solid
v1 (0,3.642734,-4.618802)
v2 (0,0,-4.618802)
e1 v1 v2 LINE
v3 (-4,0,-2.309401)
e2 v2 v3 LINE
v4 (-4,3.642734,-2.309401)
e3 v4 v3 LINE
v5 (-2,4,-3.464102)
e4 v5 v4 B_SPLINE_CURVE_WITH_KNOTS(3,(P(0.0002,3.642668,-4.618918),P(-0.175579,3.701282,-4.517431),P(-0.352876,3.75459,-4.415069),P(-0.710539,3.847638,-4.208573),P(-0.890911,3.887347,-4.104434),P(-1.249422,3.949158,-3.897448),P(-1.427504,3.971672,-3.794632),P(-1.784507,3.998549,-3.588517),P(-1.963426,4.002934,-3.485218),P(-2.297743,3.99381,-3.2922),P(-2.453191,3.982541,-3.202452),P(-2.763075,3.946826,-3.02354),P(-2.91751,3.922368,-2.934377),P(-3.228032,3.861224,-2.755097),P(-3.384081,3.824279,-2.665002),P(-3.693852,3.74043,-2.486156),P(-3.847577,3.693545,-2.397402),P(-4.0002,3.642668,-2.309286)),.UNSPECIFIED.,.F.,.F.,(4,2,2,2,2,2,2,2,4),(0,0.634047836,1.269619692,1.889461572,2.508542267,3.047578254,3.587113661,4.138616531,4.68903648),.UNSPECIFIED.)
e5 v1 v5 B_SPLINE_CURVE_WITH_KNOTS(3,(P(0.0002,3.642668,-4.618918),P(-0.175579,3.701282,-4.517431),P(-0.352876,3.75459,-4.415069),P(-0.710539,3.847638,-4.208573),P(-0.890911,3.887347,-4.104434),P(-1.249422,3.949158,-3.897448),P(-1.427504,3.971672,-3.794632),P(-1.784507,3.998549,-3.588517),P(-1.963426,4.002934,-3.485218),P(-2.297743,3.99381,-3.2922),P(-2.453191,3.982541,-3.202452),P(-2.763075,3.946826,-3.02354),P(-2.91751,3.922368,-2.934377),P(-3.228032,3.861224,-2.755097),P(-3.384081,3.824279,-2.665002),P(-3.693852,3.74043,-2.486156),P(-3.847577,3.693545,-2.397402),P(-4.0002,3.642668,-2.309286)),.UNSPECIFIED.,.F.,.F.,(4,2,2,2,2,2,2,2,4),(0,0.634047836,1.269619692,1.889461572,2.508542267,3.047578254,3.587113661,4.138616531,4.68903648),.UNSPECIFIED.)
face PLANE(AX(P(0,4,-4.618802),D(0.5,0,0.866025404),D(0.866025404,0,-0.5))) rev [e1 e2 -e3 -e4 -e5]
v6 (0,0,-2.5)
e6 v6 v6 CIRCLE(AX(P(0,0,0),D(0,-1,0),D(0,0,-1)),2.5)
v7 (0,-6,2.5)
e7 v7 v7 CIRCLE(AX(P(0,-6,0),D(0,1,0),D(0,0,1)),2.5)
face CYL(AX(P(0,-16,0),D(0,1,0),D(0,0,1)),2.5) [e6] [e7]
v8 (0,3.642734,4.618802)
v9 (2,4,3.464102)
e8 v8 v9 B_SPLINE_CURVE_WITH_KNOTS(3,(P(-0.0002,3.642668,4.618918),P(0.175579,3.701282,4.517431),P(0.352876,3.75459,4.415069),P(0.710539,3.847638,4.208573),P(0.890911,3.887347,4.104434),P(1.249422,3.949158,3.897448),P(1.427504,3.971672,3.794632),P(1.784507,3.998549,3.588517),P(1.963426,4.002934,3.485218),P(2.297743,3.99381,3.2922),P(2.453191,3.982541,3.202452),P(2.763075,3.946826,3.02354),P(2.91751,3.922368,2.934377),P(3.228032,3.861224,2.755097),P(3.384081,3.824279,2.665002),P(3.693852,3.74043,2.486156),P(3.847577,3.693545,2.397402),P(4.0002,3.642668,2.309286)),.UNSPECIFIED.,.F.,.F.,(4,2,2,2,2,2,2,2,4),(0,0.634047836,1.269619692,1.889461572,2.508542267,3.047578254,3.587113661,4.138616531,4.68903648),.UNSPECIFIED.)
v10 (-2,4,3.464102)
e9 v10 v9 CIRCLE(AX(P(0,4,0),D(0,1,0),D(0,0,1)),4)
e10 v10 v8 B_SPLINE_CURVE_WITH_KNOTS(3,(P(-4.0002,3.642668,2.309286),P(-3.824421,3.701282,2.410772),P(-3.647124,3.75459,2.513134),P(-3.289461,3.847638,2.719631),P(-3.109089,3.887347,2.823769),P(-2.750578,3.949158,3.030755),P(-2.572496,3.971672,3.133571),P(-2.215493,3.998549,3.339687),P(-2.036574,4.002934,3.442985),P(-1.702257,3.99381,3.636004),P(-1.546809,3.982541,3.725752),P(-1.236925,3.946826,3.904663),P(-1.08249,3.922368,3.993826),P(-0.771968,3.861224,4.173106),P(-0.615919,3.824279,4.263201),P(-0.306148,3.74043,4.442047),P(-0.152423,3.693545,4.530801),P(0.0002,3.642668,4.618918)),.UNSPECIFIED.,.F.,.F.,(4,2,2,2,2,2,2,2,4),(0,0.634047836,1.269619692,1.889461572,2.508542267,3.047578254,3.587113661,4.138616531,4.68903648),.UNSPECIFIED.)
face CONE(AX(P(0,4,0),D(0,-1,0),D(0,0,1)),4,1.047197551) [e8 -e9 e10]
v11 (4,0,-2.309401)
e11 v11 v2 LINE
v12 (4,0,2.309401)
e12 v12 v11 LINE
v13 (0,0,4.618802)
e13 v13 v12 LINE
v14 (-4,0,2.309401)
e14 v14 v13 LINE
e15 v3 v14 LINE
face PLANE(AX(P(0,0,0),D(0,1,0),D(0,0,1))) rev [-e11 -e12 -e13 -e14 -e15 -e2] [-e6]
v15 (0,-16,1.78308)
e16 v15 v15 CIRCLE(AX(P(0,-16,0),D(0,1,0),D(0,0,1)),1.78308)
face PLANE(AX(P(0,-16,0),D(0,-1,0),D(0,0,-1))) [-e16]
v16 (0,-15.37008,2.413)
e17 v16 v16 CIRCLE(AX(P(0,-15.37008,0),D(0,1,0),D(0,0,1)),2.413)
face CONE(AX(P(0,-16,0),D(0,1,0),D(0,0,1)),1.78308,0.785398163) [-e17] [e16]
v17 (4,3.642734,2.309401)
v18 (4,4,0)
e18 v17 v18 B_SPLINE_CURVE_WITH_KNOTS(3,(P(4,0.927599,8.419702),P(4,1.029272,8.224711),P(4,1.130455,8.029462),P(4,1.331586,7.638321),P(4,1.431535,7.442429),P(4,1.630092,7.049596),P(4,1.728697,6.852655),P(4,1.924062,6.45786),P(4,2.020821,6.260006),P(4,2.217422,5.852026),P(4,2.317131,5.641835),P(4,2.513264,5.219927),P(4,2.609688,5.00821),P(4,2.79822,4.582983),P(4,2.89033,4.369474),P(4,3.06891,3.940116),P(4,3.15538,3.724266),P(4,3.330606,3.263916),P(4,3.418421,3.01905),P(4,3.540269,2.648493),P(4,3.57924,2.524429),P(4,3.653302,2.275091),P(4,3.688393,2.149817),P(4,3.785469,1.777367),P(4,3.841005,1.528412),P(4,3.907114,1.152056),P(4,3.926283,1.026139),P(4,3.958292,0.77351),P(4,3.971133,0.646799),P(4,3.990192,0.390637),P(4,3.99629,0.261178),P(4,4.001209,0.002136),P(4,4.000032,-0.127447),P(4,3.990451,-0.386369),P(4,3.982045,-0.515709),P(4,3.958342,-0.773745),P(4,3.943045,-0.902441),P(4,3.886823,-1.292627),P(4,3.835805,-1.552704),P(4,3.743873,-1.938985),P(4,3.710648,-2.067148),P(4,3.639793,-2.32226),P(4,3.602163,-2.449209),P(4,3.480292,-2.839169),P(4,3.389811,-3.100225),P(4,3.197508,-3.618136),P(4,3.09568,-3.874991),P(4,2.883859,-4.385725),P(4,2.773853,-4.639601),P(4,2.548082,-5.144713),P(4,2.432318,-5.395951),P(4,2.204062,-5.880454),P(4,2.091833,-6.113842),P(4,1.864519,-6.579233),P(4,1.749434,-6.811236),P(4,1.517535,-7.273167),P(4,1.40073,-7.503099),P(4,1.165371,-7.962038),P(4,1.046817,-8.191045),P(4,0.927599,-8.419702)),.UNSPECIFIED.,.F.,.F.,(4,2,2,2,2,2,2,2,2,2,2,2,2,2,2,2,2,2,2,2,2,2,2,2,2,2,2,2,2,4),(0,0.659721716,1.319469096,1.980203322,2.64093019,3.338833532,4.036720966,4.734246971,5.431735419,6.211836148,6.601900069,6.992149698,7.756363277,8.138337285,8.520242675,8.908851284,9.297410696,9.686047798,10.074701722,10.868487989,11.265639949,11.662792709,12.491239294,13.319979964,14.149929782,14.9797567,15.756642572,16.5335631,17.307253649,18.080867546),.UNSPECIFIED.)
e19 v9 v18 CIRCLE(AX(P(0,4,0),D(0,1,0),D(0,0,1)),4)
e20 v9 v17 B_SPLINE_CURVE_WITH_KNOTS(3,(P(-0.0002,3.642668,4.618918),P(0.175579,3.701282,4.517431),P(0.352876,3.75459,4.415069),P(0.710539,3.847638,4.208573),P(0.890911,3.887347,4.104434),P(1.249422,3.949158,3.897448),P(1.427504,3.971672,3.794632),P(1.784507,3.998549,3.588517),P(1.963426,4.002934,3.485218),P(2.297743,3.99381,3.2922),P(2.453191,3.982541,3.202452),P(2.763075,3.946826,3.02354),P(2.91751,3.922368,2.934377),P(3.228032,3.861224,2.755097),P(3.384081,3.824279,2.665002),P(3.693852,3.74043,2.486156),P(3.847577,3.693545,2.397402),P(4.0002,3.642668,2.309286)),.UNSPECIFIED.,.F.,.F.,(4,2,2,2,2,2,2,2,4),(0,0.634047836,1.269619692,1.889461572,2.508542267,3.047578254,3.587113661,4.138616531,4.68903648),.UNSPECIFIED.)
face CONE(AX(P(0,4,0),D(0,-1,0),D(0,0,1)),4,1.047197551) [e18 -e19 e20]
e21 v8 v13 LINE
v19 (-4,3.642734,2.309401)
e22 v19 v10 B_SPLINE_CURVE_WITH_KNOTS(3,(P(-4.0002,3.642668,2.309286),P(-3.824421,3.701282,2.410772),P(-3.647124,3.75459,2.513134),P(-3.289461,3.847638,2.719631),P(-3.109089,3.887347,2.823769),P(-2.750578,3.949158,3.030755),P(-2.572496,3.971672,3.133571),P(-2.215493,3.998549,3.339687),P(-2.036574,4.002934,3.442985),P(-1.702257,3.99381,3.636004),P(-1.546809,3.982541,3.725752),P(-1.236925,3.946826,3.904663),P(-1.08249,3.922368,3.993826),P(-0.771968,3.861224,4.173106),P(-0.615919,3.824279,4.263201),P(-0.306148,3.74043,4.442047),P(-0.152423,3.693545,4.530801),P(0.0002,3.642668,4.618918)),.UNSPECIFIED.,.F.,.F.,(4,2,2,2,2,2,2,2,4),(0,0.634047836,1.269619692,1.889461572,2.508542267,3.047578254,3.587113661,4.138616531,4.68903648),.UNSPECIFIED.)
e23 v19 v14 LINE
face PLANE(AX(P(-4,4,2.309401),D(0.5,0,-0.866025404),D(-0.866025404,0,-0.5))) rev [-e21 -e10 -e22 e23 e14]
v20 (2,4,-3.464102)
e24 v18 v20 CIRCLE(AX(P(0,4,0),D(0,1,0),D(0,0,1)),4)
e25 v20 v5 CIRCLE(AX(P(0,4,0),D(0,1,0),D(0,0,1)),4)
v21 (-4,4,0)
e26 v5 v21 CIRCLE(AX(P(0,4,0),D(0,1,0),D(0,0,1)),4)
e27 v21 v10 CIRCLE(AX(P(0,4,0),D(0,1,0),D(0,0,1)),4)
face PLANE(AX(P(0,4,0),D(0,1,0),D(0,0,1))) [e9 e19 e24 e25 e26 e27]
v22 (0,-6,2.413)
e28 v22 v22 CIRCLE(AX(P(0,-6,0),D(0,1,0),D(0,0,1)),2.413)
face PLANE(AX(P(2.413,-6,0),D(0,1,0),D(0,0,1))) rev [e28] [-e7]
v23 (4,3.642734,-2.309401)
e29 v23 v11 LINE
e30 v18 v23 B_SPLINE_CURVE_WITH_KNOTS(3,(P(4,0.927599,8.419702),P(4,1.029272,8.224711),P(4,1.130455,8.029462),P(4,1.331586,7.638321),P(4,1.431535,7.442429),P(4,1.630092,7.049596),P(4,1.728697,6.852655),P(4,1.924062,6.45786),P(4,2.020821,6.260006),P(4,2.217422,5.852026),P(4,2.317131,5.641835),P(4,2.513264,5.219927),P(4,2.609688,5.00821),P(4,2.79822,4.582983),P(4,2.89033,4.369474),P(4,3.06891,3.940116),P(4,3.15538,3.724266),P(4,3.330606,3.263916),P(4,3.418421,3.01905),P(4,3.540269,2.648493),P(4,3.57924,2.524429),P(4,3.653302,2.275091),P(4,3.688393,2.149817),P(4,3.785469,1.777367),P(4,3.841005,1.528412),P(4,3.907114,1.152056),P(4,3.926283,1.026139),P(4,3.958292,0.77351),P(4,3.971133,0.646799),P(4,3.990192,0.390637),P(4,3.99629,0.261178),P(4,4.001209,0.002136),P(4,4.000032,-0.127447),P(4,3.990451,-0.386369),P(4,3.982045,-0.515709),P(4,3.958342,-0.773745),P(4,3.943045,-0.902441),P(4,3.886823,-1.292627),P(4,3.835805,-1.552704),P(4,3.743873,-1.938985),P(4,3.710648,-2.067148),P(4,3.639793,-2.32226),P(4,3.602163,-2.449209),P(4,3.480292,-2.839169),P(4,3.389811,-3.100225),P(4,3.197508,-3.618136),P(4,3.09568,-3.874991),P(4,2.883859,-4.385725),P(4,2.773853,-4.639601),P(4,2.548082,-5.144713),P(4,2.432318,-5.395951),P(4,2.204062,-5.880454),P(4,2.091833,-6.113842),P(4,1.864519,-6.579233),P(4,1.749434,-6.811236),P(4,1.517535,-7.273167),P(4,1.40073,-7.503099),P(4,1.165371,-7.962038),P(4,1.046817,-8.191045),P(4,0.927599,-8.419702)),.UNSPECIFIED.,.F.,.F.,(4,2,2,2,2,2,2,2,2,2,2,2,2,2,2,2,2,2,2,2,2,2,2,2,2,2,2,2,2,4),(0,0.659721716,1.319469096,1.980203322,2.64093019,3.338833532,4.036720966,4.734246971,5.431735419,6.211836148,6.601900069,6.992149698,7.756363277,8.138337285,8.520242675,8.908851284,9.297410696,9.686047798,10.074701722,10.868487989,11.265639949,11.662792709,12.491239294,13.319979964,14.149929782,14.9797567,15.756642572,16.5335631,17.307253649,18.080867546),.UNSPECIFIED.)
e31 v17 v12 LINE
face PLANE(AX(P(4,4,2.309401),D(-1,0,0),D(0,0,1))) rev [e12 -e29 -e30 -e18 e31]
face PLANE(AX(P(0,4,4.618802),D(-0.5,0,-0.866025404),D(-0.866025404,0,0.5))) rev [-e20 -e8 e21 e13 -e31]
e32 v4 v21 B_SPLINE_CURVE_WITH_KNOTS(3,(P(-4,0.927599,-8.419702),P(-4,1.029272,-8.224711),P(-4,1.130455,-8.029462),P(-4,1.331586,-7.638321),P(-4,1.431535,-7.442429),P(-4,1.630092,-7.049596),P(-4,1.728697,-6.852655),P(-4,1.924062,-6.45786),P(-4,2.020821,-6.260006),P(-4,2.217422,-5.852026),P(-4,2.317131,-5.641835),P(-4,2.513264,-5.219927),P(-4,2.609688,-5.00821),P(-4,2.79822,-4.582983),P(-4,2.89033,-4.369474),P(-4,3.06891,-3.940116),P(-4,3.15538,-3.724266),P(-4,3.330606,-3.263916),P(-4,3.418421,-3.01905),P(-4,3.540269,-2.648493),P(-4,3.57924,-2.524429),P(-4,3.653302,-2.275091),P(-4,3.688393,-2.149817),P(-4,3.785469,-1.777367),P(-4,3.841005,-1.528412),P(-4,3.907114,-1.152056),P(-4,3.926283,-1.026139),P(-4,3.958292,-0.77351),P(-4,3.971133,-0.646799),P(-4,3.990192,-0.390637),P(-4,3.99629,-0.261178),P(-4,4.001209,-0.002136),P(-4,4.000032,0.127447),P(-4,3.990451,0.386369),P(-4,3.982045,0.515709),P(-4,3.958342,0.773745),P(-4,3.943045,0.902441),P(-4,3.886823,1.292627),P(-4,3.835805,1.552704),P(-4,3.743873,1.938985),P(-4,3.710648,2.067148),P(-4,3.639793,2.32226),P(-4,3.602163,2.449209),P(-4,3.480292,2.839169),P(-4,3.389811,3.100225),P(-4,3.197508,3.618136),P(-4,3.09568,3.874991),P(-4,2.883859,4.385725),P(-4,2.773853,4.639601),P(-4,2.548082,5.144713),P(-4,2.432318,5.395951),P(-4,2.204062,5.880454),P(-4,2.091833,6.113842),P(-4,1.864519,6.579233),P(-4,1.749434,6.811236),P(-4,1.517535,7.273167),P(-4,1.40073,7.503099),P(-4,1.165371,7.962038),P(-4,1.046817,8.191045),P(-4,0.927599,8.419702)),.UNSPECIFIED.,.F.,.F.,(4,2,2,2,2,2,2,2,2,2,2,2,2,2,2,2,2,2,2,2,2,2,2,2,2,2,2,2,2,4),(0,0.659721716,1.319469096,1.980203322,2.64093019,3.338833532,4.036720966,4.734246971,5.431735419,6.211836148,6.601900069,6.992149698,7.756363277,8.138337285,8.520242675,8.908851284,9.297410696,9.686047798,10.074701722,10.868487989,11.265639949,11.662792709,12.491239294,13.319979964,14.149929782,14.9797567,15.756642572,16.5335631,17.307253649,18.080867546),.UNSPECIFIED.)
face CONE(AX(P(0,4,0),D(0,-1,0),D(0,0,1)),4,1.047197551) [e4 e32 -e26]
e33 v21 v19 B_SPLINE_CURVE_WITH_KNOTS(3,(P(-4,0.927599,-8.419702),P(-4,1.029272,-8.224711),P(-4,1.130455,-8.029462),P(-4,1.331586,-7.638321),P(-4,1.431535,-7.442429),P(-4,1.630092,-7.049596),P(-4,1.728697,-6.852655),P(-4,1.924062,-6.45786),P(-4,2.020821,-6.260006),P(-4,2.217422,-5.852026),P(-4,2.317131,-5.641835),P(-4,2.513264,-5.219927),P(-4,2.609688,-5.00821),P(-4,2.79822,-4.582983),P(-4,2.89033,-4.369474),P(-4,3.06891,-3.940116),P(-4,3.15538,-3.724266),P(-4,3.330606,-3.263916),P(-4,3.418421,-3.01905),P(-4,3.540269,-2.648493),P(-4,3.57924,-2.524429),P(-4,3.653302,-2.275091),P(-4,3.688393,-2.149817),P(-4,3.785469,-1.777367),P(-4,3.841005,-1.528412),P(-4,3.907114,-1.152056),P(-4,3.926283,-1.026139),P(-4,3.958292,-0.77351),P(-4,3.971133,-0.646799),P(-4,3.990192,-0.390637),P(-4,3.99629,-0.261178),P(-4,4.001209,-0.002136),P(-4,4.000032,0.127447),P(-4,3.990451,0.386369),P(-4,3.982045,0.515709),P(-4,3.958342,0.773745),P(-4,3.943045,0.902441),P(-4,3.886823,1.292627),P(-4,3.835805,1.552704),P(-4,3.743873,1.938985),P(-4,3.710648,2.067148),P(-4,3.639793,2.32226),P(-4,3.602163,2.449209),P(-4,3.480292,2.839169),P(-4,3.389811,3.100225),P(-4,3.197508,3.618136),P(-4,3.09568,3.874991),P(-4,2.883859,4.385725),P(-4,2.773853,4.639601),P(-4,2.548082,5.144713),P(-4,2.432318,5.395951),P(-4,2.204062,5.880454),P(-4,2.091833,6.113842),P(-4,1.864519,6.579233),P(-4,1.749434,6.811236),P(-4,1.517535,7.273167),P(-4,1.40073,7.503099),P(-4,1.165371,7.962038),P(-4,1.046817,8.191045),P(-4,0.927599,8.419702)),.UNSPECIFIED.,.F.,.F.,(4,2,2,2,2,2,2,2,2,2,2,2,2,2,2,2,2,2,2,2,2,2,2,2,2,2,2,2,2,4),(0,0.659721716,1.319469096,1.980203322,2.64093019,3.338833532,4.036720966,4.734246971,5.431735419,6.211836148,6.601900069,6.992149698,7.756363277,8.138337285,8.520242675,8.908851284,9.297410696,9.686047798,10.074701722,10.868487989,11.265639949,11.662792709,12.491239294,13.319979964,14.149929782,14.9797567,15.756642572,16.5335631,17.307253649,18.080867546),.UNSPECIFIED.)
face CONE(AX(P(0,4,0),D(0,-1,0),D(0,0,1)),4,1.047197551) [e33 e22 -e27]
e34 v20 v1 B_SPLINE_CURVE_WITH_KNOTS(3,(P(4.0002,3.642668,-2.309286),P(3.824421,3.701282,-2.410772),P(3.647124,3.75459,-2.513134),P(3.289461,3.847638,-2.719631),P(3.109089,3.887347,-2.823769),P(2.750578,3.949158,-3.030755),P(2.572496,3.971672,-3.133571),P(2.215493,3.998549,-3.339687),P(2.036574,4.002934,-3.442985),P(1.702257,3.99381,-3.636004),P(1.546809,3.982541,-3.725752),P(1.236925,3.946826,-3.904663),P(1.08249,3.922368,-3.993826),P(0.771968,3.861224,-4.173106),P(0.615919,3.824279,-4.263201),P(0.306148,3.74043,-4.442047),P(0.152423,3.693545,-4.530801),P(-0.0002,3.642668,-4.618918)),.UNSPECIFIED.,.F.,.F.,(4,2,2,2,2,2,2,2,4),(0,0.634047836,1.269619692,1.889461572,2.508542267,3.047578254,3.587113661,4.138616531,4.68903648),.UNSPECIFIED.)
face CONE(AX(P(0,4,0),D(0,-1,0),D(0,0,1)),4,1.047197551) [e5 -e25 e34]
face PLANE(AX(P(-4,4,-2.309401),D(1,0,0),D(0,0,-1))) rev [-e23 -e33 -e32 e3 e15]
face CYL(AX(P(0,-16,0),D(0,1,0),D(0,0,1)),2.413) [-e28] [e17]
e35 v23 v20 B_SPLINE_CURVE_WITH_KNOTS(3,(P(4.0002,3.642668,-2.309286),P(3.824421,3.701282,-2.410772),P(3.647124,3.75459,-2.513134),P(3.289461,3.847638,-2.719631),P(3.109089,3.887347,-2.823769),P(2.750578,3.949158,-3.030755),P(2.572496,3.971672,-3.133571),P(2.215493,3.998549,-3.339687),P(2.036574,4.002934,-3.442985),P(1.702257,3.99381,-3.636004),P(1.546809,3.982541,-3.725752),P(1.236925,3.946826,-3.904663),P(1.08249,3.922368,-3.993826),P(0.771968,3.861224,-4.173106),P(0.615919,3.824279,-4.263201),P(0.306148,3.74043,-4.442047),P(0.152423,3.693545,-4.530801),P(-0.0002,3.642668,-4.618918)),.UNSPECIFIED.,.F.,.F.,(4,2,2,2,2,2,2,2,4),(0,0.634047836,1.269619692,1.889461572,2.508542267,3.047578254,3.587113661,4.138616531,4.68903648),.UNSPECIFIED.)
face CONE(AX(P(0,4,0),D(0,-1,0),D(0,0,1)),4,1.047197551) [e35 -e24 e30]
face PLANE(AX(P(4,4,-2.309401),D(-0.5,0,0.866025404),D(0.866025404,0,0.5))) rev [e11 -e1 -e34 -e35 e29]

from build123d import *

# Parameters (mm, degrees)
EXTRUDE_1_DEPTH     = 4
SKETCH_2_R          = 2.5
EXTRUDE_2_DEPTH     = 16
SKETCH_3_OUTSIDE_W  = 70.114
SKETCH_3_OUTSIDE_H  = 71.352
SKETCH_3_OUTSIDE_R  = 4
CUT_EXTRUDE_1_DEPTH = 16
CUT_EXTRUDE_1_DRAFT = -60


# Read off the part's stored shape, not the designer's step: #10-24 机械螺纹 螺柱4
with BuildPart() as part:
    # 草图1 → 凸台-拉伸1 (new body)
    with BuildSketch(Plane(origin=(0, 0, 0), x_dir=(1, 0, 0), z_dir=(0, 1, 0))):
        Polygon((4, -2.309401077), (4, 2.309401077), (0, 4.618802154), (-4, 2.309401077), (-4, -2.309401077), (0, -4.618802154), align=None)
    extrude(amount=EXTRUDE_1_DEPTH)

    # 草图2 → 凸台-拉伸2 (add)
    with BuildSketch(Plane.XZ):
        with Locations(Location((0, 0, 0), (0, 0, 270))):
            Circle(SKETCH_2_R)
    extrude(amount=EXTRUDE_2_DEPTH)


with BuildPart() as cut_extrude_1_tool:
    # 草图3 outside → 切除-拉伸1 (with draft: the straight prism first)
    with BuildSketch(Plane(origin=(0, 4, 0), x_dir=(1, 0, 0), z_dir=(0, 1, 0))):
        Rectangle(SKETCH_3_OUTSIDE_W, SKETCH_3_OUTSIDE_H)
        Circle(SKETCH_3_OUTSIDE_R, mode=Mode.SUBTRACT)
    extrude(amount=-CUT_EXTRUDE_1_DEPTH)
    # 切除-拉伸1: the draft: its side faces are tilted about the plane it starts from
    cut_extrude_1_sides = [cut_extrude_1_tool.faces().sort_by_distance(p)[0] for p in [
        (0, -4, 35.676),
        (35.057, -4, 0),
        (0, -4, -35.676),
        (-35.057, -4, 0),
        (-4, -4, 0),
    ]]
    draft(cut_extrude_1_sides, Plane(origin=(0, 4, 0), x_dir=(1, 0, 0), z_dir=(0, 1, 0)), CUT_EXTRUDE_1_DRAFT)


with BuildPart() as part_1:
    add(part.part)

    # 切除-拉伸1: cut by cut_extrude_1_tool
    add(cut_extrude_1_tool.part, mode=Mode.SUBTRACT)

    # #10-24 机械螺纹 螺柱4 outline → #10-24 机械螺纹 螺柱4 (revolve, cut)
    with BuildSketch(Plane.XY):
        Polygon((1.78308, -16), (2.5, -16), (2.5, -6), (2.413, -6), (2.413, -15.37008), align=None)
    revolve(axis=Axis((0, 0, 0), (0, 1, 0)), mode=Mode.SUBTRACT)


solid = part_1.part
